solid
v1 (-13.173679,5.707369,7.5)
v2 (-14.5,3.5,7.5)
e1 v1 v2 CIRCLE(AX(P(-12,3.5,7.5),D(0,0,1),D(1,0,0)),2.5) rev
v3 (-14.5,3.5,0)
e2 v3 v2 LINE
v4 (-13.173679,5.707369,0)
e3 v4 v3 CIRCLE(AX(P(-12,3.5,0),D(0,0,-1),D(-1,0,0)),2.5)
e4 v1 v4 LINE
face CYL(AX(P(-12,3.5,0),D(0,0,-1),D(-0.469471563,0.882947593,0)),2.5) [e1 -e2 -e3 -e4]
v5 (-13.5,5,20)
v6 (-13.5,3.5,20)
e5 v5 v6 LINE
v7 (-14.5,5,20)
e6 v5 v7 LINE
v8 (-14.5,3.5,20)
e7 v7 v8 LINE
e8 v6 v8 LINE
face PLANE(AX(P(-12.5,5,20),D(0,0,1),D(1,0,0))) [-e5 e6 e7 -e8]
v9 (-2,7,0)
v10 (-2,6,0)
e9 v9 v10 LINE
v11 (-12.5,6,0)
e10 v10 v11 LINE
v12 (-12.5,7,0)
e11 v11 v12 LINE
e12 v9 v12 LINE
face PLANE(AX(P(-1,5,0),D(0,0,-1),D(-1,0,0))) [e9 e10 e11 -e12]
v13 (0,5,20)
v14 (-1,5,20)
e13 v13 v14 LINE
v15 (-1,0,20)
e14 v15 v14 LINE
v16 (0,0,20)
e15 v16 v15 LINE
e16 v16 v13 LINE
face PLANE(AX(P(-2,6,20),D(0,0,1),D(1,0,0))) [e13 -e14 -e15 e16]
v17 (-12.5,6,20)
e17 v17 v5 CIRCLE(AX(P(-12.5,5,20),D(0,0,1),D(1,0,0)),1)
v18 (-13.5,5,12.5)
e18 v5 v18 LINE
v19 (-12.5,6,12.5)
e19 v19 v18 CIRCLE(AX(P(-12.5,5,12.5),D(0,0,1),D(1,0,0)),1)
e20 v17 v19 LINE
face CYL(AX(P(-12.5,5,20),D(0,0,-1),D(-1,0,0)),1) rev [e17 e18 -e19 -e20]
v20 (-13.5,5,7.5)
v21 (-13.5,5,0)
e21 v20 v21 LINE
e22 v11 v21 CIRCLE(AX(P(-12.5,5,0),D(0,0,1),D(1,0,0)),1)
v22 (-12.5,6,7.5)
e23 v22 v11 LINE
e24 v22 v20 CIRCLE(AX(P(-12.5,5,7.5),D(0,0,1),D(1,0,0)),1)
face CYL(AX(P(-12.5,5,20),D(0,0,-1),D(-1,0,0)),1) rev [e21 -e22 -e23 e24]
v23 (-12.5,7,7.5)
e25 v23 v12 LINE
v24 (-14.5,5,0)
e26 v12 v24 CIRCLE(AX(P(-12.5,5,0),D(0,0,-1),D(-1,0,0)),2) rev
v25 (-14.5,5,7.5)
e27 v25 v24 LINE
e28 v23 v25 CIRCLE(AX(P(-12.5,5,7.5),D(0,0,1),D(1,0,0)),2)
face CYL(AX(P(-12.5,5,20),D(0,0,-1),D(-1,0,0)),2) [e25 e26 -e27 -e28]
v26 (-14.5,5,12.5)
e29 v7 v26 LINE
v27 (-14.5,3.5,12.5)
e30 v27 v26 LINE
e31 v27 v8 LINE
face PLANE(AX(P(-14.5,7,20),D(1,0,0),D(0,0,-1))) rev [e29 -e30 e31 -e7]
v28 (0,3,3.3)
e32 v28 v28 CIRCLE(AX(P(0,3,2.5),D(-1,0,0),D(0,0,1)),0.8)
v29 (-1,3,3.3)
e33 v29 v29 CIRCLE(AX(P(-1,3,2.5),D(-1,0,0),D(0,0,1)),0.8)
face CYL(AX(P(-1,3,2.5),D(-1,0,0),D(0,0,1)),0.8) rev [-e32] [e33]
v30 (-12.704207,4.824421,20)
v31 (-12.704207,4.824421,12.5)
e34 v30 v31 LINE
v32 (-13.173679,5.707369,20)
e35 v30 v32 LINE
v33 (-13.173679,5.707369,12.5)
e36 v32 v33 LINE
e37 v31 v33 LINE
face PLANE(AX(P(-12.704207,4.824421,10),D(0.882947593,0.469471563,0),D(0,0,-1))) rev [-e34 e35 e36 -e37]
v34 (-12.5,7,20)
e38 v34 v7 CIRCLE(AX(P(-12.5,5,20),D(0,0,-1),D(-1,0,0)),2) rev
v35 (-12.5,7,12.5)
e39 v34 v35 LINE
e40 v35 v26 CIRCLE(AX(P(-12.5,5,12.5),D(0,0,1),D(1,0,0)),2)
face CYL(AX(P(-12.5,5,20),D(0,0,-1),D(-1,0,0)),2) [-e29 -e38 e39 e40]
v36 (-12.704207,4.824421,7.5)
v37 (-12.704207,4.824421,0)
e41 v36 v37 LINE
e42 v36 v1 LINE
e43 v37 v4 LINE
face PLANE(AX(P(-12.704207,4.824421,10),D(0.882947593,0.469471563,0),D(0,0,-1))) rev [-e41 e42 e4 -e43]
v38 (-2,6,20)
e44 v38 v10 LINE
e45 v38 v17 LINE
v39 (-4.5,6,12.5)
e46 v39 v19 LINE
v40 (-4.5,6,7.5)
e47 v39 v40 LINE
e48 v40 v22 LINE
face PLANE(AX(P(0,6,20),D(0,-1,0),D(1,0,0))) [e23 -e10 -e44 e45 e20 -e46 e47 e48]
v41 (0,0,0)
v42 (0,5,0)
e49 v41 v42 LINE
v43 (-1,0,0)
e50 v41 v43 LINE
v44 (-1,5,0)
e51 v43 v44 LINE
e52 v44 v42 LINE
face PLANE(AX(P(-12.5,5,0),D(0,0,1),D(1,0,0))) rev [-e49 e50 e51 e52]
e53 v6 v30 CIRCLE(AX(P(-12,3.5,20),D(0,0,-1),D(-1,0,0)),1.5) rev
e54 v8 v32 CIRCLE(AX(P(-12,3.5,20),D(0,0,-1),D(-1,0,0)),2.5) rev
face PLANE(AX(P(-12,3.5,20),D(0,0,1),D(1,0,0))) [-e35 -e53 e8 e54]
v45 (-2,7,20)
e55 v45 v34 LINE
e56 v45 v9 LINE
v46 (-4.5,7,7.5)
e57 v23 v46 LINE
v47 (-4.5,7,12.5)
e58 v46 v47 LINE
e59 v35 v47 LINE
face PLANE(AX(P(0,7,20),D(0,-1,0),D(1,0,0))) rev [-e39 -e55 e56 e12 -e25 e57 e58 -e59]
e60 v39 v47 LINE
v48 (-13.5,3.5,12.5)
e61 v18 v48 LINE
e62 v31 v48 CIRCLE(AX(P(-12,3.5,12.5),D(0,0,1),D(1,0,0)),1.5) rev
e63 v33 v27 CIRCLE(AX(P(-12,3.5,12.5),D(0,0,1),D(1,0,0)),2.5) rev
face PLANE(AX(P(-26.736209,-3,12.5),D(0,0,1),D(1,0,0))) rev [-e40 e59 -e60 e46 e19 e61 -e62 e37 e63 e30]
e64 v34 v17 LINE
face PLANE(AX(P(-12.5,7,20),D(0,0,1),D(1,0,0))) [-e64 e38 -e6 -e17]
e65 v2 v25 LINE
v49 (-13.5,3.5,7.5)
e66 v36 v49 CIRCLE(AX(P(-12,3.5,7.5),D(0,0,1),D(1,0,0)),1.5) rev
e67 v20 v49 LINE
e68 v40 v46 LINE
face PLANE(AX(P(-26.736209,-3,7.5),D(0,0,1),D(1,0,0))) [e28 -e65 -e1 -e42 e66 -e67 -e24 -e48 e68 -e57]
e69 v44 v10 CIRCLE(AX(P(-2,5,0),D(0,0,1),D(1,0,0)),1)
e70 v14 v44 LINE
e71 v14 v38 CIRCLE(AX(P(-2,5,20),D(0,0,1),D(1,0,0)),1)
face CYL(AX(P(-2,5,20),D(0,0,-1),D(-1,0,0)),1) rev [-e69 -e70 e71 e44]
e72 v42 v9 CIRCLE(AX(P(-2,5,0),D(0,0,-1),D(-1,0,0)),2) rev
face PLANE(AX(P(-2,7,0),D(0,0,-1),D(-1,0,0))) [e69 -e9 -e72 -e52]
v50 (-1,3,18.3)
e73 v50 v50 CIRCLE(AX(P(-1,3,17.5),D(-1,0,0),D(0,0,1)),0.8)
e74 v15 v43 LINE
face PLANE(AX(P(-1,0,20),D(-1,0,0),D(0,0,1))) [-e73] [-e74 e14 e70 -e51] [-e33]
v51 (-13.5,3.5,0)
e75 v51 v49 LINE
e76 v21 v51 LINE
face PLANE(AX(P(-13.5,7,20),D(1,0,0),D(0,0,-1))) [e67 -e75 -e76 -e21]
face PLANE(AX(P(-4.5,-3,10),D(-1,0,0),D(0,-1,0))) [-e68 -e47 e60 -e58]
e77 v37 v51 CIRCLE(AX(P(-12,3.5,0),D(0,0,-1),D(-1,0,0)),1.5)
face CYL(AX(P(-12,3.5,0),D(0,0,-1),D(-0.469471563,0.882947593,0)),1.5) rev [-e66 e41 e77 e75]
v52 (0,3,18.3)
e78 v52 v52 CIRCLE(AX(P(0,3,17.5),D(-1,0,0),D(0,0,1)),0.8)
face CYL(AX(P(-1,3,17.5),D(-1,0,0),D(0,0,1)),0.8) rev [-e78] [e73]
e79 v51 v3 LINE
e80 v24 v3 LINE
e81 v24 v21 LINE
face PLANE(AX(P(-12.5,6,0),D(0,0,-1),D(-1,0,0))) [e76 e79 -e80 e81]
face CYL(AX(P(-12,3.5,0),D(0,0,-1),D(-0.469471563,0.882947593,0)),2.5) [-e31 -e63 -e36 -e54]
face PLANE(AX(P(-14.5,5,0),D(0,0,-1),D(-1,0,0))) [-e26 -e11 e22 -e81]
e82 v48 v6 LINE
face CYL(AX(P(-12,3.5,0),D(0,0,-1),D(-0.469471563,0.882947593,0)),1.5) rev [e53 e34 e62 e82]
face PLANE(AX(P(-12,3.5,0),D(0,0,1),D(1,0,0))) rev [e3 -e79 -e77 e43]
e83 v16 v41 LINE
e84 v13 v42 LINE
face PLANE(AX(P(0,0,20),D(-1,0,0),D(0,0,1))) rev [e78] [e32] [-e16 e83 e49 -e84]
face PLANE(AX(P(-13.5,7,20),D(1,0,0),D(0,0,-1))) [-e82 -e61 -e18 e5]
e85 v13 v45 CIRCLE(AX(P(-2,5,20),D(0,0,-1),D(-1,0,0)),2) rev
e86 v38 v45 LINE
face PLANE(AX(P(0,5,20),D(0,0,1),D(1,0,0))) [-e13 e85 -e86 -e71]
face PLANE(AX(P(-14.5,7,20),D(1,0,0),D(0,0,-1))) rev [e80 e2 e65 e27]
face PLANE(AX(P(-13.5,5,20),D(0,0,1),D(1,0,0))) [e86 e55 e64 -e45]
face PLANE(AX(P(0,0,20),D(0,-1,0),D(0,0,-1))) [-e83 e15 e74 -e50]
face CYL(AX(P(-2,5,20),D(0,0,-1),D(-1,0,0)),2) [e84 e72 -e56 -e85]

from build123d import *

# Parameters (mm, degrees)
BASE_FLANGE1_DEPTH        = 20
HEM1_DEPTH                = 20
HEM1_2_DEPTH              = 20
SKETCH5_W                 = 8
SKETCH5_H                 = 5
SKETCH5_W_2               = 2
CUT_EXTRUDE4_DEPTH        = 10
M2X0_4_TAPPED_HOLE1_D     = 1.6
M2X0_4_TAPPED_HOLE1_DEPTH = 5.2
M2X0_4_TAPPED_HOLE1_TIP   = 0.480688495


# Read off the part's stored shape, not the designer's step: Hem1
# Sheet-metal steps are written as plain solids
with BuildPart() as part:
    # Sketch1 → Base-Flange1 (new body)
    with BuildSketch(Plane.XY):
        with BuildLine():
            Line((0, 0), (0, 5))
            ThreePointArc((0, 5), (-0.585786438, 6.414213562), (-2, 7))
            Line((-2, 7), (-12.5, 7))
            ThreePointArc((-12.5, 7), (-13.914213562, 6.414213562), (-14.5, 5))
            Line((-14.5, 5), (-14.5, 1))
            Line((-14.5, 1), (-13.5, 1))
            Line((-13.5, 1), (-13.5, 5))
            ThreePointArc((-13.5, 5), (-13.207106781, 5.707106781), (-12.5, 6))
            Line((-12.5, 6), (-2, 6))
            ThreePointArc((-2, 6), (-1.292893219, 5.707106781), (-1, 5))
            Line((-1, 5), (-1, 0))
            Line((-1, 0), (0, 0))
        make_face()
    extrude(amount=BASE_FLANGE1_DEPTH)

    # Hem1 outline → Hem1 (cut)
    with BuildSketch(Plane.XY):
        with BuildLine():
            Line((-13.5, 1), (-13.5, 1.5))
            ThreePointArc((-13.5, 1.5), (-14.236067978, 2.381966011), (-14.5, 3.5))
            Line((-14.5, 3.5), (-14.5, 1))
            Line((-14.5, 1), (-13.5, 1))
        make_face()
    extrude(amount=HEM1_DEPTH, mode=Mode.SUBTRACT)

    # Hem1 2 outline → Hem1 2 (add)
    with BuildSketch(Plane.XY):
        with BuildLine():
            Line((-13.173678907, 5.707368982), (-12.704207344, 4.824421389))
            ThreePointArc((-12.704207344, 4.824421389), (-10.714249049, 2.727442887), (-13.5, 3.5))
            Line((-13.5, 3.5), (-13.5, 1.5))
            ThreePointArc((-13.5, 1.5), (-9.507485574, 3.30668203), (-13.173678907, 5.707368982))
        make_face()
    extrude(amount=HEM1_2_DEPTH)

    # Sketch5 → Cut-Extrude4 (cut)
    with BuildSketch(Plane(origin=(0, 7, 0), x_dir=(1, 0, 0), z_dir=(0, 1, 0))):
        with Locations((-8.5, -10)):
            Rectangle(SKETCH5_W, SKETCH5_H)
        with Locations((-13.5, -10)):
            Rectangle(SKETCH5_W_2, SKETCH5_H)
    extrude(amount=-CUT_EXTRUDE4_DEPTH, mode=Mode.SUBTRACT)

    # M2x0.4 Tapped Hole1
    with Locations(Plane.ZY.offset(1)):
        with Locations((2.5, 3), (17.5, 3)):
            Hole(M2X0_4_TAPPED_HOLE1_D / 2, depth=M2X0_4_TAPPED_HOLE1_DEPTH)
            with Locations((0, 0, -(M2X0_4_TAPPED_HOLE1_DEPTH + M2X0_4_TAPPED_HOLE1_TIP / 2))):  # 118° drill point
                Cone(0, M2X0_4_TAPPED_HOLE1_D / 2, M2X0_4_TAPPED_HOLE1_TIP, mode=Mode.SUBTRACT)


solid = part.part
